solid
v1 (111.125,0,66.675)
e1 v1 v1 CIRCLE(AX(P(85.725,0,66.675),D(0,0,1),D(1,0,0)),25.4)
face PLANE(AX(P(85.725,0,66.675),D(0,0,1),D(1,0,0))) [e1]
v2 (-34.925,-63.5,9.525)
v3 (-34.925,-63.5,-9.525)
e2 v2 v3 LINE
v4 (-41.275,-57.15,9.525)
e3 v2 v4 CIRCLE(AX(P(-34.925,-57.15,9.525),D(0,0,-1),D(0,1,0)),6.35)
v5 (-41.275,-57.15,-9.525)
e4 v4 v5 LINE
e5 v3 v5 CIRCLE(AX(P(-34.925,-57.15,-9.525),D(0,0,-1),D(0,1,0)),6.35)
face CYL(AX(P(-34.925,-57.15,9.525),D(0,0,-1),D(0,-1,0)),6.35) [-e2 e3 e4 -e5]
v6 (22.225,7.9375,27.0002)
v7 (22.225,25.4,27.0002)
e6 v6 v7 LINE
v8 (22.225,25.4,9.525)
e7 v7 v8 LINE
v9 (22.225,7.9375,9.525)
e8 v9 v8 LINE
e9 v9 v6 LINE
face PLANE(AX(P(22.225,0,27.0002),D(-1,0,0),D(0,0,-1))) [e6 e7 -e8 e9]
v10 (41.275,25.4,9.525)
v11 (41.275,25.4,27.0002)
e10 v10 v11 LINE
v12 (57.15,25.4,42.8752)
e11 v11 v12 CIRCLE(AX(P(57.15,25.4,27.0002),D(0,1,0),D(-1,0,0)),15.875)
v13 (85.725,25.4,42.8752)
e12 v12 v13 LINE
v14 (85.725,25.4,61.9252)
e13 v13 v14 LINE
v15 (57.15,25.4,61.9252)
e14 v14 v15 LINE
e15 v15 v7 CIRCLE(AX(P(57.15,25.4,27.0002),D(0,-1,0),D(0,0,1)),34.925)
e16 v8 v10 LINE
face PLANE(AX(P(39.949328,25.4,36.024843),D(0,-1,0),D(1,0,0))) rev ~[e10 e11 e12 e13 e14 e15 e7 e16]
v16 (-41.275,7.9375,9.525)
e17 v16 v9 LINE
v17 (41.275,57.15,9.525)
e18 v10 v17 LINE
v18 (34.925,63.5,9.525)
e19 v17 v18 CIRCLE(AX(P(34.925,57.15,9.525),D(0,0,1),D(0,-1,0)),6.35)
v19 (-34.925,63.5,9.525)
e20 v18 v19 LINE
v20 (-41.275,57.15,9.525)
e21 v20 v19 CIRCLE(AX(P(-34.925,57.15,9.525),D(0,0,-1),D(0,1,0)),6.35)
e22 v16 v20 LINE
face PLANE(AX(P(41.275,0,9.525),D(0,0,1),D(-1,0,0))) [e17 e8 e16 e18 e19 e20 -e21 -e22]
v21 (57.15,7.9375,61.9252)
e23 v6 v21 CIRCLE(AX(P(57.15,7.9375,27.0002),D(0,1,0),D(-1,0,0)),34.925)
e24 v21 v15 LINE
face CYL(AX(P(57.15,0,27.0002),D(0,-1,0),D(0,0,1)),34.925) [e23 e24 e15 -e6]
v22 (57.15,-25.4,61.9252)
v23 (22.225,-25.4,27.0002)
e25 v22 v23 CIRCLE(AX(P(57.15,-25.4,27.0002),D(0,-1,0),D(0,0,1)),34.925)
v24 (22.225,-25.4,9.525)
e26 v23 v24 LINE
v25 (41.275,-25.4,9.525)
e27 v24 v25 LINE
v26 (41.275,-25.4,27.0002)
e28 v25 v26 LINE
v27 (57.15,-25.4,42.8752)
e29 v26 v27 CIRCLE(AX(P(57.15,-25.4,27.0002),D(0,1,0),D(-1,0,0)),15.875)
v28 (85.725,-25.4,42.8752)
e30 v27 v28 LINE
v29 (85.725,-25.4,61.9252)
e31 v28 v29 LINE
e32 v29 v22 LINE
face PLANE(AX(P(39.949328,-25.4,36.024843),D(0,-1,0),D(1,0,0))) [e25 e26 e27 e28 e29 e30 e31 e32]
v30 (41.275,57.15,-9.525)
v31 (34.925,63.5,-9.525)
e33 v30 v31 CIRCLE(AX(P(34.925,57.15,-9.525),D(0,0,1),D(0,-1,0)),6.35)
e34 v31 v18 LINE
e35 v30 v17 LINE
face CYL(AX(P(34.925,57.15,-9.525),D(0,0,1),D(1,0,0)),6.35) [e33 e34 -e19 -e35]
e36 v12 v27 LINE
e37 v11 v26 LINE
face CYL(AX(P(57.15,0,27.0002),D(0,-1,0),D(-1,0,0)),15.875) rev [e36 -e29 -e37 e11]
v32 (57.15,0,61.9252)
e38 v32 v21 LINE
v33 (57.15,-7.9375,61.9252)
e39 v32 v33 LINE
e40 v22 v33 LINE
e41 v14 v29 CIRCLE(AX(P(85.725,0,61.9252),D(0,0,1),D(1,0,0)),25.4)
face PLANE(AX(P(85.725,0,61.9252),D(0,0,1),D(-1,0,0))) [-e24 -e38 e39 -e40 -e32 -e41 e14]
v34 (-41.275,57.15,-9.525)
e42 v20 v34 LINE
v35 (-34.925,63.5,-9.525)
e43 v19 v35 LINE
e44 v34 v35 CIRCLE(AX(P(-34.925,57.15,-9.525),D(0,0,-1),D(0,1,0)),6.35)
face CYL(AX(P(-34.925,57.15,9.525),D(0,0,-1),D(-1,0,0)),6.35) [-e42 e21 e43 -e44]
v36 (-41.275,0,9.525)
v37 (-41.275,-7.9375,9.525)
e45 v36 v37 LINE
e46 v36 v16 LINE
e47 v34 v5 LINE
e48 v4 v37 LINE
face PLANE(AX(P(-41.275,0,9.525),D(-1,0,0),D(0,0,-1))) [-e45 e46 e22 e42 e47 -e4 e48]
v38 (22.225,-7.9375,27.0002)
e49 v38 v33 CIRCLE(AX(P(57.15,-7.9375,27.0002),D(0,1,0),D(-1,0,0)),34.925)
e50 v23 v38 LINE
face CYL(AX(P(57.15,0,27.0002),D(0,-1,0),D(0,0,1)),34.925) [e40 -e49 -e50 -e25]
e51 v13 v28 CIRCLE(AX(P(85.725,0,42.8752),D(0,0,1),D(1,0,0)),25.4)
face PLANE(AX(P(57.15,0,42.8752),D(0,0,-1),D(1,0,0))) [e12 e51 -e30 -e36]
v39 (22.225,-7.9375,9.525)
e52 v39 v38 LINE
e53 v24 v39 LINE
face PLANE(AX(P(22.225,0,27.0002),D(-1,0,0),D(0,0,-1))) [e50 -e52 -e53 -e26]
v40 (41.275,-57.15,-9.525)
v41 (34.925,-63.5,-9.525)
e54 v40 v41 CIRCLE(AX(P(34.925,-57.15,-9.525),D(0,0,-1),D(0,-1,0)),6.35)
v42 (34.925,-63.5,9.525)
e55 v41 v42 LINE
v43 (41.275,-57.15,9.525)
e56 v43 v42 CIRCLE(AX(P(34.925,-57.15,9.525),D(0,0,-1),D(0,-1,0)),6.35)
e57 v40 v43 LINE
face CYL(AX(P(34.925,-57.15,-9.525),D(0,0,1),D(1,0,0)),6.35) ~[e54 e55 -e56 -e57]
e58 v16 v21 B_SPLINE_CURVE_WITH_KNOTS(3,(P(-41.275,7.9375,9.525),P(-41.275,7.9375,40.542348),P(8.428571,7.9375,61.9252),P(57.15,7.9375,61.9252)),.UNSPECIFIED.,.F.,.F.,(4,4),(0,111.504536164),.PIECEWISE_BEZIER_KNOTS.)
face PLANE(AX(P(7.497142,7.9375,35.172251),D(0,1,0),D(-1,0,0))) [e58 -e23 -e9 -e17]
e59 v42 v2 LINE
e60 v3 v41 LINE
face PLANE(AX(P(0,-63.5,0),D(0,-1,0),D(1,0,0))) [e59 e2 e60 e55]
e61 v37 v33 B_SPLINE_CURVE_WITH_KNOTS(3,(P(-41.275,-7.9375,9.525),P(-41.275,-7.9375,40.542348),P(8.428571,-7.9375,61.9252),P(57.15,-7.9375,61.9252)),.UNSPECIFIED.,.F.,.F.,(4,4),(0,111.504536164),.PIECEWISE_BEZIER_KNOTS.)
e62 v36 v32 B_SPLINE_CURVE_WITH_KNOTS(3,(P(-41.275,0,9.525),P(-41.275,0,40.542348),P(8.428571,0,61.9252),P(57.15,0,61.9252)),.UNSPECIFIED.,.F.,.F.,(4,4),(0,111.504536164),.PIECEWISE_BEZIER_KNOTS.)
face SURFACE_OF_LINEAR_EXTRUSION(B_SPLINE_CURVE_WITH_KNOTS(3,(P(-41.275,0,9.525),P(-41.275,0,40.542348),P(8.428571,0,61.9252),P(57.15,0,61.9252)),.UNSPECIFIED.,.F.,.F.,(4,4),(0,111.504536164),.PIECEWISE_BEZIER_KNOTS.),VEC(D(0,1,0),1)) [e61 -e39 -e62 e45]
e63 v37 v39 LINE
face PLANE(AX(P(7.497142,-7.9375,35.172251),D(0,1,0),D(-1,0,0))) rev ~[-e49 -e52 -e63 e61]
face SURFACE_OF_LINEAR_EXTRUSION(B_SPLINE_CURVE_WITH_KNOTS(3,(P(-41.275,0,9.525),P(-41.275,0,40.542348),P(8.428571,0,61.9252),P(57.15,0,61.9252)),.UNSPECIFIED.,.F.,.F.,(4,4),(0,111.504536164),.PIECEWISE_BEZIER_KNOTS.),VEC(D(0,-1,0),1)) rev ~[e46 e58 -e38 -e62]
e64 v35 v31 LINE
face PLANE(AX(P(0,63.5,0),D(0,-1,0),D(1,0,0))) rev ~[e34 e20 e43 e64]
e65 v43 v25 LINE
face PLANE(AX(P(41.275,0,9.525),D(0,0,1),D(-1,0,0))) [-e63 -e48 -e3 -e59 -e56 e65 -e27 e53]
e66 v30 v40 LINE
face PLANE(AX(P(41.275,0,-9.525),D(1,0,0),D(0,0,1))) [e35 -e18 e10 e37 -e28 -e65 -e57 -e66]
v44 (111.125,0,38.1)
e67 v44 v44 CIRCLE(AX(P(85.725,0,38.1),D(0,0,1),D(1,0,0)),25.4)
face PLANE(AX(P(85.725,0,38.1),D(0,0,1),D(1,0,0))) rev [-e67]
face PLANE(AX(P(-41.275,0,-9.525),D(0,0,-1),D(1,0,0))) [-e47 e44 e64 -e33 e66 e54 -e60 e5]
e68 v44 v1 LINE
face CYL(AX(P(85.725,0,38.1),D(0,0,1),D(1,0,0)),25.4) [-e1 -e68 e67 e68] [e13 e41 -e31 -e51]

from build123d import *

# Parameters (mm, degrees)
F1_DEPTH = 63.5
F0_W     = 25.4
F0_H     = 19.05
F2_DEPTH = 25.4
F3_DEPTH = 7.9375
F5_R     = 6.35


# Not quite as in the source:
# - a feature names something its author has since deleted; it is built from what else it names


with BuildPart() as f1:
    # F0 (on Front) → F1 (new body, symmetric)
    with BuildSketch(Plane.XZ):
        Polygon((-41.275, 9.525), (-41.275, -9.525), (41.275, -9.525), (41.275, 9.525), (22.225, 9.525), align=None)
    extrude(amount=F1_DEPTH, both=True)

    # F0 (on Front) → F2 (join, symmetric)
    with BuildSketch(Plane.XZ):
        with BuildLine():
            Line((22.225, 9.525), (41.275, 9.525))
            Line((41.275, 9.525), (41.275, 27.0002))
            ThreePointArc((41.275, 27.0002), (45.9246798487, 38.2255201513), (57.15, 42.8752))
            Line((57.15, 42.8752), (60.325, 42.8752))
            Line((60.325, 42.8752), (60.325, 61.9252))
            Line((60.325, 61.9252), (57.15, 61.9252))
            ThreePointArc((57.15, 61.9252), (32.4542956671, 51.6959043329), (22.225, 27.0002))
            Line((22.225, 27.0002), (22.225, 9.525))
        make_face()
        with Locations((73.025, 52.4002)):
            Rectangle(F0_W, F0_H)
    extrude(amount=F2_DEPTH, both=True)

    # F0 (on Front) → F3 (join, symmetric)
    with BuildSketch(Plane.XZ):
        with BuildLine():
            add(Edge.make_bspline(
                [(-41.275, 9.525), (-41.275, 40.5423477454), (8.4285710651, 61.9252), (57.15, 61.9252)],
                knots=[0, 0, 0, 0, 111.5045361635, 111.5045361635, 111.5045361635, 111.5045361635], degree=3))
            Line((-41.275, 9.525), (22.225, 9.525))
            Line((22.225, 9.525), (22.225, 27.0002))
            ThreePointArc((22.225, 27.0002), (32.4542956671, 51.6959043329), (57.15, 61.9252))
        make_face()
    extrude(amount=F3_DEPTH, both=True)

    # F0 (on Front) → F4 (revolve)
    with BuildSketch(Plane.XZ):
        Polygon((85.725, 66.675), (85.725, 61.9252), (85.725, 42.8752), (85.725, 38.1), (111.125, 38.1), (111.125, 66.675), align=None)
    revolve(axis=Axis((85.725, 0, 52.3875), (0, 0, 1)))

    # F5
    f5_edges = [f1.edges().sort_by_distance(p)[0] for p in [
        (41.275, -63.5, 0),
        (-41.275, -63.5, 0),
        (41.275, 63.5, 0),
        (-41.275, 63.5, 0),
    ]]
    fillet(f5_edges, radius=F5_R)


solid = f1.part
